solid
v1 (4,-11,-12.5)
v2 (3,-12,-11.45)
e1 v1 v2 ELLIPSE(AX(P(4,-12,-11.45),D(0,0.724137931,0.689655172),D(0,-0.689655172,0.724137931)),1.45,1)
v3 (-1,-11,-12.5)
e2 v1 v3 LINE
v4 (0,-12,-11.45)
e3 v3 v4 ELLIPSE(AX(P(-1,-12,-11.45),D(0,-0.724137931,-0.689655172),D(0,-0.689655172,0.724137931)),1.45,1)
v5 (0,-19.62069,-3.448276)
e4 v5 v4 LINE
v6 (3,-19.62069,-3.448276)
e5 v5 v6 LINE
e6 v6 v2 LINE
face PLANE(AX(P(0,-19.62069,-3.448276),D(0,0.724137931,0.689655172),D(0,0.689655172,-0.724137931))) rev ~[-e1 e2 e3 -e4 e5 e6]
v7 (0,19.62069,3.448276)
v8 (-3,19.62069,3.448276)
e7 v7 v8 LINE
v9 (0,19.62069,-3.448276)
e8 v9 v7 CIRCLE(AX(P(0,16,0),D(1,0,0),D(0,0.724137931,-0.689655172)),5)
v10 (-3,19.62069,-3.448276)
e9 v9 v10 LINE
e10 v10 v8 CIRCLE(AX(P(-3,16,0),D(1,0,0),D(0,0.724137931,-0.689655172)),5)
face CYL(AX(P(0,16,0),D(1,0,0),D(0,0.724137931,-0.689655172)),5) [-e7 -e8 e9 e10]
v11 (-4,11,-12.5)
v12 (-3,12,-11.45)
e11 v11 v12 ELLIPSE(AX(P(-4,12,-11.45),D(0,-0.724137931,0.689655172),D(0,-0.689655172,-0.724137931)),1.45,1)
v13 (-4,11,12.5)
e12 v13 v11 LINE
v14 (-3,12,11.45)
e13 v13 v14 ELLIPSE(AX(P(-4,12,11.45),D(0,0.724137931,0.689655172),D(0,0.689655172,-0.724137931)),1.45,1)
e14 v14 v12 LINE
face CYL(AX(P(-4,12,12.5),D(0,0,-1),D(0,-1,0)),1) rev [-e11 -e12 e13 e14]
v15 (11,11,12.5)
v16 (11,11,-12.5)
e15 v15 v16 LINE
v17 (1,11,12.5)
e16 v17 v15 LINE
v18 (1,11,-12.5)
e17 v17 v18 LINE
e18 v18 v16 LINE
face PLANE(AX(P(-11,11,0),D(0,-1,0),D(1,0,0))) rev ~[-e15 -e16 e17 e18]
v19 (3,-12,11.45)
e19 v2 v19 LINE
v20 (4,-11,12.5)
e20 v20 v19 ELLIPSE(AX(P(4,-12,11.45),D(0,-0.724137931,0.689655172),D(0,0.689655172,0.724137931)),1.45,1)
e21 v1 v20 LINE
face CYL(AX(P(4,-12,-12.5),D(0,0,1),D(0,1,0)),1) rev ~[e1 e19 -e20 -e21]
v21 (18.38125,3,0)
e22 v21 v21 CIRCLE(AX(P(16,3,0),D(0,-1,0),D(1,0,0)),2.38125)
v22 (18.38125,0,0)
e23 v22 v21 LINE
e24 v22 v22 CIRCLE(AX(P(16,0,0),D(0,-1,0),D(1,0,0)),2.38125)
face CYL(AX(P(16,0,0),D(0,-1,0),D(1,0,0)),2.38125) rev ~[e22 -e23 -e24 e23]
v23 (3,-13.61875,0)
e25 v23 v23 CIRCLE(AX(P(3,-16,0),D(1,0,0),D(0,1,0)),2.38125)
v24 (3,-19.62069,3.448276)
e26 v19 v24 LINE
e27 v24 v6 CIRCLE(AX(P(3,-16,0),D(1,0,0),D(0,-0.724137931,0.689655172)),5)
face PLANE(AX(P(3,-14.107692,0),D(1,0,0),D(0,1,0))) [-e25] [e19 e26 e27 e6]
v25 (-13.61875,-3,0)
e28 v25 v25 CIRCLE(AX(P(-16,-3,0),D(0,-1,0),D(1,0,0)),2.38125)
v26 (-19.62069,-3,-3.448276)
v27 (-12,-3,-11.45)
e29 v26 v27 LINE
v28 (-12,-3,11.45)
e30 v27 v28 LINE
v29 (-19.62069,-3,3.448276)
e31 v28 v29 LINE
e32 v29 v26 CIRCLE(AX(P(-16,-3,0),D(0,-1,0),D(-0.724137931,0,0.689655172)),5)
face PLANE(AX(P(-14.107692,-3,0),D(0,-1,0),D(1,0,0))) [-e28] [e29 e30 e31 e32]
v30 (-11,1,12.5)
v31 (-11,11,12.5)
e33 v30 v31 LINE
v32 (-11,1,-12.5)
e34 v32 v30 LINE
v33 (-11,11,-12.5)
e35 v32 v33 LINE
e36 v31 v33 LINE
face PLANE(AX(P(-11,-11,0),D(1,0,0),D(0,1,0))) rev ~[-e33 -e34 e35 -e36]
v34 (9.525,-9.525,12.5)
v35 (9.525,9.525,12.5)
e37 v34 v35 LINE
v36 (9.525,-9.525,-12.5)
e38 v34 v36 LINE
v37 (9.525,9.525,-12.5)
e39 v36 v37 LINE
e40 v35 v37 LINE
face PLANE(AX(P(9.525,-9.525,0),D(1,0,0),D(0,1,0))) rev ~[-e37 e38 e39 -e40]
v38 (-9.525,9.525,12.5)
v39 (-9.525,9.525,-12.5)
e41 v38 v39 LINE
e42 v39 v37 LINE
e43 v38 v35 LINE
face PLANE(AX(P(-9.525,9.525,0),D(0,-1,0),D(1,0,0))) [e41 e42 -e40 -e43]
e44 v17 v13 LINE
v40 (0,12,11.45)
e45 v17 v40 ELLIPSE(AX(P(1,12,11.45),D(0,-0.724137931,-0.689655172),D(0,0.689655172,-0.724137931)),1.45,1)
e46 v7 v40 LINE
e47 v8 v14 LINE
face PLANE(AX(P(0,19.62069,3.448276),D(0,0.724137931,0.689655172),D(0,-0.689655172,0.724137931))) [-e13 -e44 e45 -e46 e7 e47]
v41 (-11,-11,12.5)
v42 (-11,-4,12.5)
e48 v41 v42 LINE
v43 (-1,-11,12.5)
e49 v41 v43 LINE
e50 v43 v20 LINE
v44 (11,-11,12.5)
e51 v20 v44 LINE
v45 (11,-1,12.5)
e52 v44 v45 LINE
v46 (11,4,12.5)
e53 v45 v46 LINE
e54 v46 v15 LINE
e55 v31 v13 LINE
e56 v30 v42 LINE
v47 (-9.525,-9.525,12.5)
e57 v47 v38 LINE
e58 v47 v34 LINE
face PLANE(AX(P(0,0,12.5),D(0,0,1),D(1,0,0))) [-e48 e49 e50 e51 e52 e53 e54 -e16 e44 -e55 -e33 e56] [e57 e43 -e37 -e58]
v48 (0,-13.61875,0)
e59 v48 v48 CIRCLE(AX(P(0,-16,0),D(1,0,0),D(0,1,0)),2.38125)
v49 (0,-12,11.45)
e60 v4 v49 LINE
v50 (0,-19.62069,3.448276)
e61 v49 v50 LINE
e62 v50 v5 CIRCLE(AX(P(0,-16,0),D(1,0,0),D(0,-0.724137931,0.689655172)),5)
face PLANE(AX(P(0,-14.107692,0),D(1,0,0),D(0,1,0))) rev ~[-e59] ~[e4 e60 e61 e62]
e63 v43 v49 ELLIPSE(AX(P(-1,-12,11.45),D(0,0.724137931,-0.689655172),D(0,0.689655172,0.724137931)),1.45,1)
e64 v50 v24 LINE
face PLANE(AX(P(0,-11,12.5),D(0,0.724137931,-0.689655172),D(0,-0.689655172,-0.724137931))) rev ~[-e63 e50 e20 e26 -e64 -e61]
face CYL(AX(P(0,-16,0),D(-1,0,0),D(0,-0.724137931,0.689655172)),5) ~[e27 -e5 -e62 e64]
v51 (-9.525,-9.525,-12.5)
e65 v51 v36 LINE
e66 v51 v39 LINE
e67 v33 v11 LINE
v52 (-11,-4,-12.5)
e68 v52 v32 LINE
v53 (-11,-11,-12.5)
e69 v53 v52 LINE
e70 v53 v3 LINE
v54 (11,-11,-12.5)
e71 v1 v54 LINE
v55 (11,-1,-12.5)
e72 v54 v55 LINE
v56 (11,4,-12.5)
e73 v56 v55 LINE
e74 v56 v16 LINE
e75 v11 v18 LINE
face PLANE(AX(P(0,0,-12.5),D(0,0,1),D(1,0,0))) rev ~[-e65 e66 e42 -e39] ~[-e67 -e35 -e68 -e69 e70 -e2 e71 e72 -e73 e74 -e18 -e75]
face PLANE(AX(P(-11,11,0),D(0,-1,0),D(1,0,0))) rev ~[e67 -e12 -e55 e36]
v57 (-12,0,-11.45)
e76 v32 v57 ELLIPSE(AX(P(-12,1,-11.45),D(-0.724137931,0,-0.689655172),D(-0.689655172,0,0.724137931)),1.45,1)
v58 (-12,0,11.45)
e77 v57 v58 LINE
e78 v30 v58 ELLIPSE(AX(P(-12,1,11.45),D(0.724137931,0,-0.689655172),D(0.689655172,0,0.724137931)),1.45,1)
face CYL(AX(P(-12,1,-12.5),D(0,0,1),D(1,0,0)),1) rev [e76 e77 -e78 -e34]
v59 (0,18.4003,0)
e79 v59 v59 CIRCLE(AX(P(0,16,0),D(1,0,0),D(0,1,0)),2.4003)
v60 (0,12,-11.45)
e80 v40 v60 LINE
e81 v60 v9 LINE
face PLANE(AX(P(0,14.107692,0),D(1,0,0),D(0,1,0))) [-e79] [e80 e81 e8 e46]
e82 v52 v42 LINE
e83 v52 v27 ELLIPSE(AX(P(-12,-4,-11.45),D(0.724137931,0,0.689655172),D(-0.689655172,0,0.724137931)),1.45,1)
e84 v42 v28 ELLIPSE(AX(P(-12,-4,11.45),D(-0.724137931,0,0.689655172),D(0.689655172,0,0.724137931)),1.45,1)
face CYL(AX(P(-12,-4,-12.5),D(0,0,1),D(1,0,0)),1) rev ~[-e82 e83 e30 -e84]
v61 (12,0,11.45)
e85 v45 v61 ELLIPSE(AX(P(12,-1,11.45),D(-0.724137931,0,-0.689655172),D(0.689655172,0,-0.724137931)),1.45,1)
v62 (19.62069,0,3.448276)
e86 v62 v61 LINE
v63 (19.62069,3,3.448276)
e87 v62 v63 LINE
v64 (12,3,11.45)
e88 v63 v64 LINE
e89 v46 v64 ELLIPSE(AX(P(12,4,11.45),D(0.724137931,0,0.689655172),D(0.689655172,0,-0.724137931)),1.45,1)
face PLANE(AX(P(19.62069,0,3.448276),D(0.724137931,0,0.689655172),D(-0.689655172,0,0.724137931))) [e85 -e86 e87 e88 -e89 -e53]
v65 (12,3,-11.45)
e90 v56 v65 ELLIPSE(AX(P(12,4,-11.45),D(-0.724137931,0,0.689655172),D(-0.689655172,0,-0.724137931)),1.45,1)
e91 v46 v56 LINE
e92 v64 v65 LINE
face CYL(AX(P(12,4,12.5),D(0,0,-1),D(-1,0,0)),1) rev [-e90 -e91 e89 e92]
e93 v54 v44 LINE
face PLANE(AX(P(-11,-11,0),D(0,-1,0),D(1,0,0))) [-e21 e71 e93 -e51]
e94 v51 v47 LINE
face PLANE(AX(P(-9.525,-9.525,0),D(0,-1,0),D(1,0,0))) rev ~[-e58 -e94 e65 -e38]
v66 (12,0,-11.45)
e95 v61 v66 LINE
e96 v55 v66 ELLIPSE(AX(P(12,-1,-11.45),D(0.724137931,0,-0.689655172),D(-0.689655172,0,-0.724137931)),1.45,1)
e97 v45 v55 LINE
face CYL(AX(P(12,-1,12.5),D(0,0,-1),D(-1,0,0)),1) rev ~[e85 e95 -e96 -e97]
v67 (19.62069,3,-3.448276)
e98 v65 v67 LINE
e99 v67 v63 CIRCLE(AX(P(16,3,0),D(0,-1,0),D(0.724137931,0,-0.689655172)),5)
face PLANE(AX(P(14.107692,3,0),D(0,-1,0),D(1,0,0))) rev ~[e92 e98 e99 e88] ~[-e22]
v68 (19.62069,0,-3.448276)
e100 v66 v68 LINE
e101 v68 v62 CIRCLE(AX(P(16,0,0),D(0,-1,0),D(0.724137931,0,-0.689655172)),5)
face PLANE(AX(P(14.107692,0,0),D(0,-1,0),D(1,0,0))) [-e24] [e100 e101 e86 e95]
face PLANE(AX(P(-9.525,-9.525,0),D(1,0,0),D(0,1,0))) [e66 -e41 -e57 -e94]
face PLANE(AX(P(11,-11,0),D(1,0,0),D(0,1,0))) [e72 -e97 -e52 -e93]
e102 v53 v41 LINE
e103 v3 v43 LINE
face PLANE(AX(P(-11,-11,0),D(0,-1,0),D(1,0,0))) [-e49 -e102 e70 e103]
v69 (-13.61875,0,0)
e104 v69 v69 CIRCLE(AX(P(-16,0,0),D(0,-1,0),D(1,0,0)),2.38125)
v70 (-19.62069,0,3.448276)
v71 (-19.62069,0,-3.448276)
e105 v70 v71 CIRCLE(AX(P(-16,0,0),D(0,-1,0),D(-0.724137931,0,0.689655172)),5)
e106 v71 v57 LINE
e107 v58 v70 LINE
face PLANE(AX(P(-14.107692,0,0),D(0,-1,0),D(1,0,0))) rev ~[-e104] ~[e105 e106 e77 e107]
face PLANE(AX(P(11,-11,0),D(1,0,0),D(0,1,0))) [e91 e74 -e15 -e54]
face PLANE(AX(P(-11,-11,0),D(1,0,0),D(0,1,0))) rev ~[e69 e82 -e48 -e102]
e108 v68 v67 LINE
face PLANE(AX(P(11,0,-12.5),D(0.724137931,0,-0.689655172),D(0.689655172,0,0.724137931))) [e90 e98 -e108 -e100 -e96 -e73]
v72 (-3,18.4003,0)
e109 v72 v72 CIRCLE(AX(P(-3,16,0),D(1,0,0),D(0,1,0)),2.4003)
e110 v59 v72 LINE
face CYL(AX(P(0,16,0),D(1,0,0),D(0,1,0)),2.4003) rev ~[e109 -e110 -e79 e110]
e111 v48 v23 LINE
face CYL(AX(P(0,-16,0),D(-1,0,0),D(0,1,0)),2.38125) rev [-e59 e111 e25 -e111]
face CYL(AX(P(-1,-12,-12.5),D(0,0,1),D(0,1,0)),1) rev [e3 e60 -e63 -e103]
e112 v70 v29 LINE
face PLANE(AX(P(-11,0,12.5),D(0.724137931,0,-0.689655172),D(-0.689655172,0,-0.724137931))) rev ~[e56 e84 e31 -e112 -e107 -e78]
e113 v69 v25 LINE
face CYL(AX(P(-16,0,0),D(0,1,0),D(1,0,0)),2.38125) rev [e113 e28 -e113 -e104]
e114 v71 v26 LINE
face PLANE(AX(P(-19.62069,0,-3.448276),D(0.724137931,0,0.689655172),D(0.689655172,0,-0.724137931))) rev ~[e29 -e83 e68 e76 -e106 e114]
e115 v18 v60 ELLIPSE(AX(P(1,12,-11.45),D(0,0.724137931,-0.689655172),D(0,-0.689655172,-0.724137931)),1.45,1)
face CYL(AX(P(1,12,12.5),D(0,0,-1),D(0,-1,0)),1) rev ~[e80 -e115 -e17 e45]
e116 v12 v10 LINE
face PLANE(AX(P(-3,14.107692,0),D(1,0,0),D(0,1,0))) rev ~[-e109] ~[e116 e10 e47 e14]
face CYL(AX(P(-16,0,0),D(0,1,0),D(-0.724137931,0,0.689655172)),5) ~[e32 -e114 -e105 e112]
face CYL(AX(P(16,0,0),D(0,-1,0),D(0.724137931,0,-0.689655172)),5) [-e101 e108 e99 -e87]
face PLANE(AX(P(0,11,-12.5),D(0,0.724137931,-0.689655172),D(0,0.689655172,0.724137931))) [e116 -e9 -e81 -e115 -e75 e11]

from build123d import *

# Parameters (mm, degrees)
F0_W     = 22
F0_H     = 22
F0_W_2   = 19.05
F0_H_2   = 19.05
F1_DEPTH = 12.5
F2_R     = 2.38125
F3_DEPTH = 3
F4_R     = 2.38125
F5_DEPTH = 3
F6_R     = 2.38125
F7_DEPTH = 3
F8_R     = 2.4003
F9_DEPTH = 3
F10_R    = 1


# Not quite as in the source:
# - a feature names something its author has since deleted; it is built from what else it names


with BuildPart() as f1:
    # F0 (on Top) → F1 (new body, symmetric)
    with BuildSketch(Plane.XY):
        Rectangle(F0_W, F0_H)
        Rectangle(F0_W_2, F0_H_2, mode=Mode.SUBTRACT)
    extrude(amount=F1_DEPTH, both=True)

    # F2 (on Front) → F3 (join)
    with BuildSketch(Plane.XZ):
        with BuildLine():
            Line((-11, -12.5), (-11, 12.5))
            Line((-11, 12.5), (-19.6206896552, 3.4482758621))
            ThreePointArc((-19.6206896552, 3.4482758621), (-21, 0), (-19.6206896552, -3.4482758621))
            Line((-19.6206896552, -3.4482758621), (-11, -12.5))
        make_face()
        with Locations((-16, 0)):
            Circle(F2_R, mode=Mode.SUBTRACT)
    extrude(amount=F3_DEPTH)

    # F4 (on Right) → F5 (join)
    with BuildSketch(Plane.YZ):
        with BuildLine():
            Line((-11, 12.5), (-19.6206896552, 3.4482758621))
            ThreePointArc((-19.6206896552, 3.4482758621), (-21, 0), (-19.6206896552, -3.4482758621))
            Line((-19.6206896552, -3.4482758621), (-11, -12.5))
            Line((-11, -12.5), (-11, 12.5))
        make_face()
        with Locations((-16, 0)):
            Circle(F4_R, mode=Mode.SUBTRACT)
    extrude(amount=F5_DEPTH)

    # F6 (on Front) → F7 (join)
    with BuildSketch(Plane.XZ):
        with BuildLine():
            Line((11, -12.5), (19.6206896552, -3.4482758621))
            ThreePointArc((19.6206896552, -3.4482758621), (21, 0), (19.6206896552, 3.4482758621))
            Line((19.6206896552, 3.4482758621), (11, 12.5))
            Line((11, 12.5), (11, -12.5))
        make_face()
        with Locations((16, 0)):
            Circle(F6_R, mode=Mode.SUBTRACT)
    extrude(amount=-F7_DEPTH)

    # F8 (on Right) → F9 (join)
    with BuildSketch(Plane.YZ):
        with BuildLine():
            ThreePointArc((19.6206896552, -3.4482758621), (21, 0), (19.6206896552, 3.4482758621))
            Line((19.6206896552, 3.4482758621), (11, 12.5))
            Line((11, 12.5), (11, -12.5))
            Line((11, -12.5), (19.6206896552, -3.4482758621))
        make_face()
        with Locations((16, 0)):
            Circle(F8_R, mode=Mode.SUBTRACT)
    extrude(amount=-F9_DEPTH)

    # F10
    f10_edges = [f1.edges().sort_by_distance(p)[0] for p in [
        (-11, -3, 0),
        (0, -11, 0),
        (3, -11, 0),
        (-11, 0, 0),
        (11, 0, 0),
        (11, 3, 0),
        (0, 11, 0),
        (-3, 11, 0),
    ]]
    fillet(f10_edges, radius=F10_R)


solid = f1.part
